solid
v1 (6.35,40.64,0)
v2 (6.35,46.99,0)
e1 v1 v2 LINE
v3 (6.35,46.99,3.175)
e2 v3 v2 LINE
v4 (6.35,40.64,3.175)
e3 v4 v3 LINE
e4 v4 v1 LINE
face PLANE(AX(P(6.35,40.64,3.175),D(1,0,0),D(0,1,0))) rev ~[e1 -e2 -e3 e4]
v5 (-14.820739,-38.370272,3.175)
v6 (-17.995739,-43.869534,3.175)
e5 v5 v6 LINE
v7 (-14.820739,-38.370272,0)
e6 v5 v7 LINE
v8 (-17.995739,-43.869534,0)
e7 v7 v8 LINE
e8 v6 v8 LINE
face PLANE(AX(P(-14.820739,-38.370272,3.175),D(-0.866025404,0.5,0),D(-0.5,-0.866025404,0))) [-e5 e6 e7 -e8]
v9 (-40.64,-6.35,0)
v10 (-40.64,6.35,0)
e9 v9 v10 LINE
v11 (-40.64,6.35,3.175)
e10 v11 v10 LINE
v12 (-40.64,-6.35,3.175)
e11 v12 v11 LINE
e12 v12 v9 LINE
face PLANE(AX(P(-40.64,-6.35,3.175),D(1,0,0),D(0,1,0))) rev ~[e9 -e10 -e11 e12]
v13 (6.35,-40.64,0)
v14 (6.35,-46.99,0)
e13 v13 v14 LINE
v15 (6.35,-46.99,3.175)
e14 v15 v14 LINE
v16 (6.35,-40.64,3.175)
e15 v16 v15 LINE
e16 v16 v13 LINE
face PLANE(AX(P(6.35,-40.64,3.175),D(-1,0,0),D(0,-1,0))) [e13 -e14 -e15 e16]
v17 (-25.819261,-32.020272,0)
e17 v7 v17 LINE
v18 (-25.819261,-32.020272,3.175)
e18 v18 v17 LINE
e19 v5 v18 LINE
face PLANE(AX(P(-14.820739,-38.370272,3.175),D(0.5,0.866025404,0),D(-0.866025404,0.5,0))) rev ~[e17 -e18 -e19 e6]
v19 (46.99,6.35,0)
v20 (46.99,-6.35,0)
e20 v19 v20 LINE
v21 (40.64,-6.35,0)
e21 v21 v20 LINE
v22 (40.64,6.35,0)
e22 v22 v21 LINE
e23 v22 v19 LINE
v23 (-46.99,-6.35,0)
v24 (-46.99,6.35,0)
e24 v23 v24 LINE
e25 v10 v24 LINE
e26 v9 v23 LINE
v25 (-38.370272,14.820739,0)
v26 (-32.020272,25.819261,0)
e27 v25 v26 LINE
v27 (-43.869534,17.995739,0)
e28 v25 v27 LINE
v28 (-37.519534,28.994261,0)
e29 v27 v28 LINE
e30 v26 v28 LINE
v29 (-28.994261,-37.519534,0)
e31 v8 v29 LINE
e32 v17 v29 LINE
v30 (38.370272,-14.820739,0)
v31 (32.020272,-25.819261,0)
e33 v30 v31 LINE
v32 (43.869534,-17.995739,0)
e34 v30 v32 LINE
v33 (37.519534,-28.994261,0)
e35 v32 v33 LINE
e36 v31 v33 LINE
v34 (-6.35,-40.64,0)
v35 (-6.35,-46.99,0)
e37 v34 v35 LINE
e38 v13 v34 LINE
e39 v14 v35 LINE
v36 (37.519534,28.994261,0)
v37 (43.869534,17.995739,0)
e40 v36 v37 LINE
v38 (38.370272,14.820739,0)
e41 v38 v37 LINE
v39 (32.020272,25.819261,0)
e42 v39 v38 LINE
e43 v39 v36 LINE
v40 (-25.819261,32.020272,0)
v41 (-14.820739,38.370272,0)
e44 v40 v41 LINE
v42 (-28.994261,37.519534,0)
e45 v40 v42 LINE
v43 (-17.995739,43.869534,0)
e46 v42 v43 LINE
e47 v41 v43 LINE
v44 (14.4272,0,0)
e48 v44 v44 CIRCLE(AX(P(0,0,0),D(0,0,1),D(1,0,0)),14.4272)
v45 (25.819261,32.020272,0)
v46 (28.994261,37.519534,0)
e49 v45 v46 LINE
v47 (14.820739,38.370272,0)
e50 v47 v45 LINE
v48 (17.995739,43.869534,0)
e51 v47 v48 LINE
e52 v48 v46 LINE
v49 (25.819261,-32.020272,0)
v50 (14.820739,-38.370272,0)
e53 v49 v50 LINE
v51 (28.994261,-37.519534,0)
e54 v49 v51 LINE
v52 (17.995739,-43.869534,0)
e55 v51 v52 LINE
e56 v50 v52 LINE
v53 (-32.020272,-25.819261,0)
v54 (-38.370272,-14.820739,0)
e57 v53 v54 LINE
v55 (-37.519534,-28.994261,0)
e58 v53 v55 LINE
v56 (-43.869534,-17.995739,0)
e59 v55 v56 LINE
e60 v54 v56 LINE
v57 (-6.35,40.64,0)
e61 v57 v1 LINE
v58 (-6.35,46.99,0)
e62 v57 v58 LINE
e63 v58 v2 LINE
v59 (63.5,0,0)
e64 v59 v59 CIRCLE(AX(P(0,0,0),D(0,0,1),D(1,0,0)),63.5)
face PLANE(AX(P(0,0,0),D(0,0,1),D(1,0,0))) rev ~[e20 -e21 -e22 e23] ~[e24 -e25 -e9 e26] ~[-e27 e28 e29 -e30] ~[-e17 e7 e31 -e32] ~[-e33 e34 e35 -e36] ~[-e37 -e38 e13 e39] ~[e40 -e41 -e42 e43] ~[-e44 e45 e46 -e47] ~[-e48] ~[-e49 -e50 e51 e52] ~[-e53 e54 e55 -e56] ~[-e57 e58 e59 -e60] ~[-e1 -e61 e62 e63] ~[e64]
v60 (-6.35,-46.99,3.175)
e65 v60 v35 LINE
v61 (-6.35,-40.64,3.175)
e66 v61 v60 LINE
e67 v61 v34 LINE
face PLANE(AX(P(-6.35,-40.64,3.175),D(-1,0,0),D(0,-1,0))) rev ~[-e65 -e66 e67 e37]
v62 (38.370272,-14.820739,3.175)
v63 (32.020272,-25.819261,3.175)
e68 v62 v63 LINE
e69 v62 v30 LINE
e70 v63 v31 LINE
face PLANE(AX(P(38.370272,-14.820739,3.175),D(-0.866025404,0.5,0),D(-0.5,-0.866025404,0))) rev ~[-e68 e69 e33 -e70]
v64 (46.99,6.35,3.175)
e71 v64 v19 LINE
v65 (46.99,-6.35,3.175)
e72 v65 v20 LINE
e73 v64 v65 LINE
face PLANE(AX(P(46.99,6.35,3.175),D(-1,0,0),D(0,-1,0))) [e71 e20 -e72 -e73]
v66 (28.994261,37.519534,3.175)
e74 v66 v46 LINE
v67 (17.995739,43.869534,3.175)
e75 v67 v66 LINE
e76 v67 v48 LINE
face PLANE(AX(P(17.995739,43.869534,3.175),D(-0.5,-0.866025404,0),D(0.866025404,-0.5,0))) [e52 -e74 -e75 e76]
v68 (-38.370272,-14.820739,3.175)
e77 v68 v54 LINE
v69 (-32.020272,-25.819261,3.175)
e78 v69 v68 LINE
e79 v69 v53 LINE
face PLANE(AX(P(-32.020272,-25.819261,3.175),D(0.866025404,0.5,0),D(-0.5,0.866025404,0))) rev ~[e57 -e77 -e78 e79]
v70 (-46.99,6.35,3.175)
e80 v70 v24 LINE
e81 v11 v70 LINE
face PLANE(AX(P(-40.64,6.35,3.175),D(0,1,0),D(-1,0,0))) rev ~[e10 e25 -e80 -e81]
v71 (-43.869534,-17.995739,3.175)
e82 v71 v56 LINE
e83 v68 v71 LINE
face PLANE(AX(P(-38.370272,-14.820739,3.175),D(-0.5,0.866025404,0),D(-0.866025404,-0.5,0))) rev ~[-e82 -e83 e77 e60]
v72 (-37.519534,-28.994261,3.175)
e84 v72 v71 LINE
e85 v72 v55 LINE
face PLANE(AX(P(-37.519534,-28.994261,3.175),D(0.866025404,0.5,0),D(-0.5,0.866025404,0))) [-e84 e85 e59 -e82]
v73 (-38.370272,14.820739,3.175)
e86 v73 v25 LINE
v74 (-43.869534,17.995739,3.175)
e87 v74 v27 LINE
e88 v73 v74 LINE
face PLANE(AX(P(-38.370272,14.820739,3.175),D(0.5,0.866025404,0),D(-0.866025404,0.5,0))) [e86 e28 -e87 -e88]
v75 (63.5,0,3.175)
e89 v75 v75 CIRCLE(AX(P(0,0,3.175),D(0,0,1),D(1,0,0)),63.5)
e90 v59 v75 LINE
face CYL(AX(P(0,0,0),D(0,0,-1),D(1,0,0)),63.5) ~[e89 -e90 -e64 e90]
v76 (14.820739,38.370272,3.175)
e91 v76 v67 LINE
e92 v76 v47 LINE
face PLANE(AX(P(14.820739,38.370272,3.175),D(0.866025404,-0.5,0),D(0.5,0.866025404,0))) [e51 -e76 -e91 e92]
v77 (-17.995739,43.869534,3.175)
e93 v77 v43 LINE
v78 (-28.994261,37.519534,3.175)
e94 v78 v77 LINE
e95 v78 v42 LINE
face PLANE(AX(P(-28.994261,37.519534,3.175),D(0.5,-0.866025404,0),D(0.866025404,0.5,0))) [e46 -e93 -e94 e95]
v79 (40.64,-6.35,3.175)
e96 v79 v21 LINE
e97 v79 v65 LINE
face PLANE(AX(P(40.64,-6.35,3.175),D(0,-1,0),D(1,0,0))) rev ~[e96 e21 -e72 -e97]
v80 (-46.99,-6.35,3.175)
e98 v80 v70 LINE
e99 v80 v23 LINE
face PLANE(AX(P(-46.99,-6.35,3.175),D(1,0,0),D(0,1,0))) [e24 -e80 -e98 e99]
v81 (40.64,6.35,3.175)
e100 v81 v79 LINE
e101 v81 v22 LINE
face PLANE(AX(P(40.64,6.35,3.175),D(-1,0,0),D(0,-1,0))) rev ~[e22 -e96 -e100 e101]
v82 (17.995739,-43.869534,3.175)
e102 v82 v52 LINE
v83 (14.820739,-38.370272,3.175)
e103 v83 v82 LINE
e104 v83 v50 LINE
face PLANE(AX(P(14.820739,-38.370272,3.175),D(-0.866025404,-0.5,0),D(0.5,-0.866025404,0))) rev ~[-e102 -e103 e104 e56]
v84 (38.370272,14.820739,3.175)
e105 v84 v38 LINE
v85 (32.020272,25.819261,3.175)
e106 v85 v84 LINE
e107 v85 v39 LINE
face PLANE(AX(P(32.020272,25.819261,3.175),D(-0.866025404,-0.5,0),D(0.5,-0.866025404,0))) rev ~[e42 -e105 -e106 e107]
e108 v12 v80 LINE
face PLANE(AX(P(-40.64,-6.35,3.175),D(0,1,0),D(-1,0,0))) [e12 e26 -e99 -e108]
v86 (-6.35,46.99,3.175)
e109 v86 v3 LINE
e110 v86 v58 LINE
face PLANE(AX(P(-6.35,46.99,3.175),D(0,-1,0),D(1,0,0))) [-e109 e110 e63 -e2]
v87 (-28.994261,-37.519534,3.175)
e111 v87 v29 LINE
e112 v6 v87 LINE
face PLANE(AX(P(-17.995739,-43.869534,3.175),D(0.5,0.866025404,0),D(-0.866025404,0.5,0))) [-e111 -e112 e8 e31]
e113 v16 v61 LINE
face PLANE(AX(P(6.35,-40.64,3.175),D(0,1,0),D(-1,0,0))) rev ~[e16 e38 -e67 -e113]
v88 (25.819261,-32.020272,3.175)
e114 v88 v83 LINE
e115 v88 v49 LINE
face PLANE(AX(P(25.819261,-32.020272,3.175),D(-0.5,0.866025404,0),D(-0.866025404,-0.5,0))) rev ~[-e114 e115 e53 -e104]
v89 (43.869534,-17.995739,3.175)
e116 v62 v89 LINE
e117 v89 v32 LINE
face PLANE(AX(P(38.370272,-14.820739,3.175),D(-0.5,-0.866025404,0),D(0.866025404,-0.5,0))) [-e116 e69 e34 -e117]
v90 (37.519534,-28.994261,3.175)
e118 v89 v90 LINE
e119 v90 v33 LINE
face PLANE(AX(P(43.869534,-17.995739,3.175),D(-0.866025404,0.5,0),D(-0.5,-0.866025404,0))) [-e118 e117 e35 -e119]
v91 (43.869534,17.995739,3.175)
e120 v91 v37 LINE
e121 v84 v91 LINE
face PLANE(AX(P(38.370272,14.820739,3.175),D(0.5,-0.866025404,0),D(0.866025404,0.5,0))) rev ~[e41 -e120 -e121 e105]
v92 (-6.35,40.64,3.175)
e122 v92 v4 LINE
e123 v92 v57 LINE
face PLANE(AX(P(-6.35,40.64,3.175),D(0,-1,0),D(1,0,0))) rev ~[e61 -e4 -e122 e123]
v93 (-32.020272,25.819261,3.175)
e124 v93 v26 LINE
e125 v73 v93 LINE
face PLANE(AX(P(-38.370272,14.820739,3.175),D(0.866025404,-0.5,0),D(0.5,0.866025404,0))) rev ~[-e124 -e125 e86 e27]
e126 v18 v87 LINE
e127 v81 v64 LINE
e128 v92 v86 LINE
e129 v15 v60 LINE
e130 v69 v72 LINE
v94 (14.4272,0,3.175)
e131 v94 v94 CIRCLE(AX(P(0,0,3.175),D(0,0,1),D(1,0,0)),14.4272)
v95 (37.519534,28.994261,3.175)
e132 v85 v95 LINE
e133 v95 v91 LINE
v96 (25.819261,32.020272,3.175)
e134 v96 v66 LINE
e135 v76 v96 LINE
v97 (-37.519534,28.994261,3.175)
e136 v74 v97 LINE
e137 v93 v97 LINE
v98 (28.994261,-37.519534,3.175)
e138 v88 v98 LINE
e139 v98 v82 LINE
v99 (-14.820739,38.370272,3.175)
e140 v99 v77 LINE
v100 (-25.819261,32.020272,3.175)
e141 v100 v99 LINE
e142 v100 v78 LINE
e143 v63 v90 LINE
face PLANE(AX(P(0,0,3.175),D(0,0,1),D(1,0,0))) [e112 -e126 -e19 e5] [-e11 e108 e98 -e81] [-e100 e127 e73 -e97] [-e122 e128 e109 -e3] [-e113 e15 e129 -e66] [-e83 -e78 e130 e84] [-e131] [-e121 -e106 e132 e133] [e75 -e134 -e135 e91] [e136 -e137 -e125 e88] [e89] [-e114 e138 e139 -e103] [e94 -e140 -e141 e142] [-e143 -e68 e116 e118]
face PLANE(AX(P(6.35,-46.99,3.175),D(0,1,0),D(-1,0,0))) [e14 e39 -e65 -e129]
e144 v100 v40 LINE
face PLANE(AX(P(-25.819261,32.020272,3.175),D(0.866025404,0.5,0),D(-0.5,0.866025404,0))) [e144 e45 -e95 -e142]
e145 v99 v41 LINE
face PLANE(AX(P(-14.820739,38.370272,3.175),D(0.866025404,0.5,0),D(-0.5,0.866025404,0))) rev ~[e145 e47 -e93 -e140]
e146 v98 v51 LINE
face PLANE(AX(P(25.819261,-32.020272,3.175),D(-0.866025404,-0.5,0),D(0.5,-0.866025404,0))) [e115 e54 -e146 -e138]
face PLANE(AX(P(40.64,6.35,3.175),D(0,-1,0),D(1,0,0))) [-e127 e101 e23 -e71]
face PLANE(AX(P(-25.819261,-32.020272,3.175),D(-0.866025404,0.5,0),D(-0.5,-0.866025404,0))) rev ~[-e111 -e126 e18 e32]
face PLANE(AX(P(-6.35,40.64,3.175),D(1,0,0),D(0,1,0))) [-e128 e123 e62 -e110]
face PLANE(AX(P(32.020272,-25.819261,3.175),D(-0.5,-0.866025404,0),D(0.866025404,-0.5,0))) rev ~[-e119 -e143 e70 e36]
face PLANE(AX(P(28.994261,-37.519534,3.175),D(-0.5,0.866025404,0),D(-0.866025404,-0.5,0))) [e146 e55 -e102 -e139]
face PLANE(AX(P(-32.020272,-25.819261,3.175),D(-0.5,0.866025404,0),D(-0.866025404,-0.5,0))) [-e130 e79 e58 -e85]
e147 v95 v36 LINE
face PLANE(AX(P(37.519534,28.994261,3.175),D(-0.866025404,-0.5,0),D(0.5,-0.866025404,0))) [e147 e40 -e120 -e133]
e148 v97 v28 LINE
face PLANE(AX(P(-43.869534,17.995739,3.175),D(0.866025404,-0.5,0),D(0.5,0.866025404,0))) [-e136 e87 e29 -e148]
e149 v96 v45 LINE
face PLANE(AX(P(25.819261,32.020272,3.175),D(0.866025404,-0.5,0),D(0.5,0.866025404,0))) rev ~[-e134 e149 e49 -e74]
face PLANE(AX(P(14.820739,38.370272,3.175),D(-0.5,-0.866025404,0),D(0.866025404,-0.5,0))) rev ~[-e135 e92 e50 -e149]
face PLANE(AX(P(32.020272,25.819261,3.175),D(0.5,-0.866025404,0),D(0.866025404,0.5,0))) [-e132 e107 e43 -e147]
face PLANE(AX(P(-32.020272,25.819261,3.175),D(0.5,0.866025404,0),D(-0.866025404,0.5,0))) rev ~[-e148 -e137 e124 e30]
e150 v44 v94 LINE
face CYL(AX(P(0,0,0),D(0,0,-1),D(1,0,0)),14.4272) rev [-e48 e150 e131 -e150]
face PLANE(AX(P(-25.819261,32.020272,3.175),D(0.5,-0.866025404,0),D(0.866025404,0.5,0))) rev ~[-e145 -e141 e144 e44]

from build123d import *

# Parameters (mm, degrees)
F0_R            = 63.5
F0_R_2          = 14.4272
F1_DEPTH        = 3.175
F2_W            = 12.7
F2_H            = 6.35
F3_DEPTH        = 3.176
F3_COPIES_COUNT = 12
F4_R            = 2.4892
F5_DEPTH        = 182


# Not quite as in the source:
# - an extrude ends at something that could not be found from the text; its depth is read off the source's solid
# - a pattern or mirror of a feature is missing from the dataset's text; its kind, count and spacing are read off the source's solid


with BuildPart() as f1:
    # F0 (on Top) → F1 (new body)
    with BuildSketch(Plane.XY):
        Circle(F0_R)
        Circle(F0_R_2, mode=Mode.SUBTRACT)
    extrude(amount=F1_DEPTH)

    # F2 (on face) → F3 (cut, through all)
    with BuildSketch(Plane.XY.offset(3.175)):
        with Locations((0, 43.815)):
            Rectangle(F2_W, F2_H)
    f3 = extrude(amount=-F3_DEPTH, mode=Mode.SUBTRACT)

    # F3_copies: F3 ×12 about axis
    f3_copies_axis = Axis((0, 0, 0), (0, 0, 1))
    for i in range(1, F3_COPIES_COUNT):
        add(f3.rotate(f3_copies_axis, i * 360 / F3_COPIES_COUNT), mode=Mode.SUBTRACT)

    # F4 (on Top) → F5 (cut, through all)
    with BuildSketch(Plane.XY):
        with Locations((0, 23.8125)):
            Circle(F4_R)
    extrude(amount=-F5_DEPTH, mode=Mode.SUBTRACT)


solid = f1.part
